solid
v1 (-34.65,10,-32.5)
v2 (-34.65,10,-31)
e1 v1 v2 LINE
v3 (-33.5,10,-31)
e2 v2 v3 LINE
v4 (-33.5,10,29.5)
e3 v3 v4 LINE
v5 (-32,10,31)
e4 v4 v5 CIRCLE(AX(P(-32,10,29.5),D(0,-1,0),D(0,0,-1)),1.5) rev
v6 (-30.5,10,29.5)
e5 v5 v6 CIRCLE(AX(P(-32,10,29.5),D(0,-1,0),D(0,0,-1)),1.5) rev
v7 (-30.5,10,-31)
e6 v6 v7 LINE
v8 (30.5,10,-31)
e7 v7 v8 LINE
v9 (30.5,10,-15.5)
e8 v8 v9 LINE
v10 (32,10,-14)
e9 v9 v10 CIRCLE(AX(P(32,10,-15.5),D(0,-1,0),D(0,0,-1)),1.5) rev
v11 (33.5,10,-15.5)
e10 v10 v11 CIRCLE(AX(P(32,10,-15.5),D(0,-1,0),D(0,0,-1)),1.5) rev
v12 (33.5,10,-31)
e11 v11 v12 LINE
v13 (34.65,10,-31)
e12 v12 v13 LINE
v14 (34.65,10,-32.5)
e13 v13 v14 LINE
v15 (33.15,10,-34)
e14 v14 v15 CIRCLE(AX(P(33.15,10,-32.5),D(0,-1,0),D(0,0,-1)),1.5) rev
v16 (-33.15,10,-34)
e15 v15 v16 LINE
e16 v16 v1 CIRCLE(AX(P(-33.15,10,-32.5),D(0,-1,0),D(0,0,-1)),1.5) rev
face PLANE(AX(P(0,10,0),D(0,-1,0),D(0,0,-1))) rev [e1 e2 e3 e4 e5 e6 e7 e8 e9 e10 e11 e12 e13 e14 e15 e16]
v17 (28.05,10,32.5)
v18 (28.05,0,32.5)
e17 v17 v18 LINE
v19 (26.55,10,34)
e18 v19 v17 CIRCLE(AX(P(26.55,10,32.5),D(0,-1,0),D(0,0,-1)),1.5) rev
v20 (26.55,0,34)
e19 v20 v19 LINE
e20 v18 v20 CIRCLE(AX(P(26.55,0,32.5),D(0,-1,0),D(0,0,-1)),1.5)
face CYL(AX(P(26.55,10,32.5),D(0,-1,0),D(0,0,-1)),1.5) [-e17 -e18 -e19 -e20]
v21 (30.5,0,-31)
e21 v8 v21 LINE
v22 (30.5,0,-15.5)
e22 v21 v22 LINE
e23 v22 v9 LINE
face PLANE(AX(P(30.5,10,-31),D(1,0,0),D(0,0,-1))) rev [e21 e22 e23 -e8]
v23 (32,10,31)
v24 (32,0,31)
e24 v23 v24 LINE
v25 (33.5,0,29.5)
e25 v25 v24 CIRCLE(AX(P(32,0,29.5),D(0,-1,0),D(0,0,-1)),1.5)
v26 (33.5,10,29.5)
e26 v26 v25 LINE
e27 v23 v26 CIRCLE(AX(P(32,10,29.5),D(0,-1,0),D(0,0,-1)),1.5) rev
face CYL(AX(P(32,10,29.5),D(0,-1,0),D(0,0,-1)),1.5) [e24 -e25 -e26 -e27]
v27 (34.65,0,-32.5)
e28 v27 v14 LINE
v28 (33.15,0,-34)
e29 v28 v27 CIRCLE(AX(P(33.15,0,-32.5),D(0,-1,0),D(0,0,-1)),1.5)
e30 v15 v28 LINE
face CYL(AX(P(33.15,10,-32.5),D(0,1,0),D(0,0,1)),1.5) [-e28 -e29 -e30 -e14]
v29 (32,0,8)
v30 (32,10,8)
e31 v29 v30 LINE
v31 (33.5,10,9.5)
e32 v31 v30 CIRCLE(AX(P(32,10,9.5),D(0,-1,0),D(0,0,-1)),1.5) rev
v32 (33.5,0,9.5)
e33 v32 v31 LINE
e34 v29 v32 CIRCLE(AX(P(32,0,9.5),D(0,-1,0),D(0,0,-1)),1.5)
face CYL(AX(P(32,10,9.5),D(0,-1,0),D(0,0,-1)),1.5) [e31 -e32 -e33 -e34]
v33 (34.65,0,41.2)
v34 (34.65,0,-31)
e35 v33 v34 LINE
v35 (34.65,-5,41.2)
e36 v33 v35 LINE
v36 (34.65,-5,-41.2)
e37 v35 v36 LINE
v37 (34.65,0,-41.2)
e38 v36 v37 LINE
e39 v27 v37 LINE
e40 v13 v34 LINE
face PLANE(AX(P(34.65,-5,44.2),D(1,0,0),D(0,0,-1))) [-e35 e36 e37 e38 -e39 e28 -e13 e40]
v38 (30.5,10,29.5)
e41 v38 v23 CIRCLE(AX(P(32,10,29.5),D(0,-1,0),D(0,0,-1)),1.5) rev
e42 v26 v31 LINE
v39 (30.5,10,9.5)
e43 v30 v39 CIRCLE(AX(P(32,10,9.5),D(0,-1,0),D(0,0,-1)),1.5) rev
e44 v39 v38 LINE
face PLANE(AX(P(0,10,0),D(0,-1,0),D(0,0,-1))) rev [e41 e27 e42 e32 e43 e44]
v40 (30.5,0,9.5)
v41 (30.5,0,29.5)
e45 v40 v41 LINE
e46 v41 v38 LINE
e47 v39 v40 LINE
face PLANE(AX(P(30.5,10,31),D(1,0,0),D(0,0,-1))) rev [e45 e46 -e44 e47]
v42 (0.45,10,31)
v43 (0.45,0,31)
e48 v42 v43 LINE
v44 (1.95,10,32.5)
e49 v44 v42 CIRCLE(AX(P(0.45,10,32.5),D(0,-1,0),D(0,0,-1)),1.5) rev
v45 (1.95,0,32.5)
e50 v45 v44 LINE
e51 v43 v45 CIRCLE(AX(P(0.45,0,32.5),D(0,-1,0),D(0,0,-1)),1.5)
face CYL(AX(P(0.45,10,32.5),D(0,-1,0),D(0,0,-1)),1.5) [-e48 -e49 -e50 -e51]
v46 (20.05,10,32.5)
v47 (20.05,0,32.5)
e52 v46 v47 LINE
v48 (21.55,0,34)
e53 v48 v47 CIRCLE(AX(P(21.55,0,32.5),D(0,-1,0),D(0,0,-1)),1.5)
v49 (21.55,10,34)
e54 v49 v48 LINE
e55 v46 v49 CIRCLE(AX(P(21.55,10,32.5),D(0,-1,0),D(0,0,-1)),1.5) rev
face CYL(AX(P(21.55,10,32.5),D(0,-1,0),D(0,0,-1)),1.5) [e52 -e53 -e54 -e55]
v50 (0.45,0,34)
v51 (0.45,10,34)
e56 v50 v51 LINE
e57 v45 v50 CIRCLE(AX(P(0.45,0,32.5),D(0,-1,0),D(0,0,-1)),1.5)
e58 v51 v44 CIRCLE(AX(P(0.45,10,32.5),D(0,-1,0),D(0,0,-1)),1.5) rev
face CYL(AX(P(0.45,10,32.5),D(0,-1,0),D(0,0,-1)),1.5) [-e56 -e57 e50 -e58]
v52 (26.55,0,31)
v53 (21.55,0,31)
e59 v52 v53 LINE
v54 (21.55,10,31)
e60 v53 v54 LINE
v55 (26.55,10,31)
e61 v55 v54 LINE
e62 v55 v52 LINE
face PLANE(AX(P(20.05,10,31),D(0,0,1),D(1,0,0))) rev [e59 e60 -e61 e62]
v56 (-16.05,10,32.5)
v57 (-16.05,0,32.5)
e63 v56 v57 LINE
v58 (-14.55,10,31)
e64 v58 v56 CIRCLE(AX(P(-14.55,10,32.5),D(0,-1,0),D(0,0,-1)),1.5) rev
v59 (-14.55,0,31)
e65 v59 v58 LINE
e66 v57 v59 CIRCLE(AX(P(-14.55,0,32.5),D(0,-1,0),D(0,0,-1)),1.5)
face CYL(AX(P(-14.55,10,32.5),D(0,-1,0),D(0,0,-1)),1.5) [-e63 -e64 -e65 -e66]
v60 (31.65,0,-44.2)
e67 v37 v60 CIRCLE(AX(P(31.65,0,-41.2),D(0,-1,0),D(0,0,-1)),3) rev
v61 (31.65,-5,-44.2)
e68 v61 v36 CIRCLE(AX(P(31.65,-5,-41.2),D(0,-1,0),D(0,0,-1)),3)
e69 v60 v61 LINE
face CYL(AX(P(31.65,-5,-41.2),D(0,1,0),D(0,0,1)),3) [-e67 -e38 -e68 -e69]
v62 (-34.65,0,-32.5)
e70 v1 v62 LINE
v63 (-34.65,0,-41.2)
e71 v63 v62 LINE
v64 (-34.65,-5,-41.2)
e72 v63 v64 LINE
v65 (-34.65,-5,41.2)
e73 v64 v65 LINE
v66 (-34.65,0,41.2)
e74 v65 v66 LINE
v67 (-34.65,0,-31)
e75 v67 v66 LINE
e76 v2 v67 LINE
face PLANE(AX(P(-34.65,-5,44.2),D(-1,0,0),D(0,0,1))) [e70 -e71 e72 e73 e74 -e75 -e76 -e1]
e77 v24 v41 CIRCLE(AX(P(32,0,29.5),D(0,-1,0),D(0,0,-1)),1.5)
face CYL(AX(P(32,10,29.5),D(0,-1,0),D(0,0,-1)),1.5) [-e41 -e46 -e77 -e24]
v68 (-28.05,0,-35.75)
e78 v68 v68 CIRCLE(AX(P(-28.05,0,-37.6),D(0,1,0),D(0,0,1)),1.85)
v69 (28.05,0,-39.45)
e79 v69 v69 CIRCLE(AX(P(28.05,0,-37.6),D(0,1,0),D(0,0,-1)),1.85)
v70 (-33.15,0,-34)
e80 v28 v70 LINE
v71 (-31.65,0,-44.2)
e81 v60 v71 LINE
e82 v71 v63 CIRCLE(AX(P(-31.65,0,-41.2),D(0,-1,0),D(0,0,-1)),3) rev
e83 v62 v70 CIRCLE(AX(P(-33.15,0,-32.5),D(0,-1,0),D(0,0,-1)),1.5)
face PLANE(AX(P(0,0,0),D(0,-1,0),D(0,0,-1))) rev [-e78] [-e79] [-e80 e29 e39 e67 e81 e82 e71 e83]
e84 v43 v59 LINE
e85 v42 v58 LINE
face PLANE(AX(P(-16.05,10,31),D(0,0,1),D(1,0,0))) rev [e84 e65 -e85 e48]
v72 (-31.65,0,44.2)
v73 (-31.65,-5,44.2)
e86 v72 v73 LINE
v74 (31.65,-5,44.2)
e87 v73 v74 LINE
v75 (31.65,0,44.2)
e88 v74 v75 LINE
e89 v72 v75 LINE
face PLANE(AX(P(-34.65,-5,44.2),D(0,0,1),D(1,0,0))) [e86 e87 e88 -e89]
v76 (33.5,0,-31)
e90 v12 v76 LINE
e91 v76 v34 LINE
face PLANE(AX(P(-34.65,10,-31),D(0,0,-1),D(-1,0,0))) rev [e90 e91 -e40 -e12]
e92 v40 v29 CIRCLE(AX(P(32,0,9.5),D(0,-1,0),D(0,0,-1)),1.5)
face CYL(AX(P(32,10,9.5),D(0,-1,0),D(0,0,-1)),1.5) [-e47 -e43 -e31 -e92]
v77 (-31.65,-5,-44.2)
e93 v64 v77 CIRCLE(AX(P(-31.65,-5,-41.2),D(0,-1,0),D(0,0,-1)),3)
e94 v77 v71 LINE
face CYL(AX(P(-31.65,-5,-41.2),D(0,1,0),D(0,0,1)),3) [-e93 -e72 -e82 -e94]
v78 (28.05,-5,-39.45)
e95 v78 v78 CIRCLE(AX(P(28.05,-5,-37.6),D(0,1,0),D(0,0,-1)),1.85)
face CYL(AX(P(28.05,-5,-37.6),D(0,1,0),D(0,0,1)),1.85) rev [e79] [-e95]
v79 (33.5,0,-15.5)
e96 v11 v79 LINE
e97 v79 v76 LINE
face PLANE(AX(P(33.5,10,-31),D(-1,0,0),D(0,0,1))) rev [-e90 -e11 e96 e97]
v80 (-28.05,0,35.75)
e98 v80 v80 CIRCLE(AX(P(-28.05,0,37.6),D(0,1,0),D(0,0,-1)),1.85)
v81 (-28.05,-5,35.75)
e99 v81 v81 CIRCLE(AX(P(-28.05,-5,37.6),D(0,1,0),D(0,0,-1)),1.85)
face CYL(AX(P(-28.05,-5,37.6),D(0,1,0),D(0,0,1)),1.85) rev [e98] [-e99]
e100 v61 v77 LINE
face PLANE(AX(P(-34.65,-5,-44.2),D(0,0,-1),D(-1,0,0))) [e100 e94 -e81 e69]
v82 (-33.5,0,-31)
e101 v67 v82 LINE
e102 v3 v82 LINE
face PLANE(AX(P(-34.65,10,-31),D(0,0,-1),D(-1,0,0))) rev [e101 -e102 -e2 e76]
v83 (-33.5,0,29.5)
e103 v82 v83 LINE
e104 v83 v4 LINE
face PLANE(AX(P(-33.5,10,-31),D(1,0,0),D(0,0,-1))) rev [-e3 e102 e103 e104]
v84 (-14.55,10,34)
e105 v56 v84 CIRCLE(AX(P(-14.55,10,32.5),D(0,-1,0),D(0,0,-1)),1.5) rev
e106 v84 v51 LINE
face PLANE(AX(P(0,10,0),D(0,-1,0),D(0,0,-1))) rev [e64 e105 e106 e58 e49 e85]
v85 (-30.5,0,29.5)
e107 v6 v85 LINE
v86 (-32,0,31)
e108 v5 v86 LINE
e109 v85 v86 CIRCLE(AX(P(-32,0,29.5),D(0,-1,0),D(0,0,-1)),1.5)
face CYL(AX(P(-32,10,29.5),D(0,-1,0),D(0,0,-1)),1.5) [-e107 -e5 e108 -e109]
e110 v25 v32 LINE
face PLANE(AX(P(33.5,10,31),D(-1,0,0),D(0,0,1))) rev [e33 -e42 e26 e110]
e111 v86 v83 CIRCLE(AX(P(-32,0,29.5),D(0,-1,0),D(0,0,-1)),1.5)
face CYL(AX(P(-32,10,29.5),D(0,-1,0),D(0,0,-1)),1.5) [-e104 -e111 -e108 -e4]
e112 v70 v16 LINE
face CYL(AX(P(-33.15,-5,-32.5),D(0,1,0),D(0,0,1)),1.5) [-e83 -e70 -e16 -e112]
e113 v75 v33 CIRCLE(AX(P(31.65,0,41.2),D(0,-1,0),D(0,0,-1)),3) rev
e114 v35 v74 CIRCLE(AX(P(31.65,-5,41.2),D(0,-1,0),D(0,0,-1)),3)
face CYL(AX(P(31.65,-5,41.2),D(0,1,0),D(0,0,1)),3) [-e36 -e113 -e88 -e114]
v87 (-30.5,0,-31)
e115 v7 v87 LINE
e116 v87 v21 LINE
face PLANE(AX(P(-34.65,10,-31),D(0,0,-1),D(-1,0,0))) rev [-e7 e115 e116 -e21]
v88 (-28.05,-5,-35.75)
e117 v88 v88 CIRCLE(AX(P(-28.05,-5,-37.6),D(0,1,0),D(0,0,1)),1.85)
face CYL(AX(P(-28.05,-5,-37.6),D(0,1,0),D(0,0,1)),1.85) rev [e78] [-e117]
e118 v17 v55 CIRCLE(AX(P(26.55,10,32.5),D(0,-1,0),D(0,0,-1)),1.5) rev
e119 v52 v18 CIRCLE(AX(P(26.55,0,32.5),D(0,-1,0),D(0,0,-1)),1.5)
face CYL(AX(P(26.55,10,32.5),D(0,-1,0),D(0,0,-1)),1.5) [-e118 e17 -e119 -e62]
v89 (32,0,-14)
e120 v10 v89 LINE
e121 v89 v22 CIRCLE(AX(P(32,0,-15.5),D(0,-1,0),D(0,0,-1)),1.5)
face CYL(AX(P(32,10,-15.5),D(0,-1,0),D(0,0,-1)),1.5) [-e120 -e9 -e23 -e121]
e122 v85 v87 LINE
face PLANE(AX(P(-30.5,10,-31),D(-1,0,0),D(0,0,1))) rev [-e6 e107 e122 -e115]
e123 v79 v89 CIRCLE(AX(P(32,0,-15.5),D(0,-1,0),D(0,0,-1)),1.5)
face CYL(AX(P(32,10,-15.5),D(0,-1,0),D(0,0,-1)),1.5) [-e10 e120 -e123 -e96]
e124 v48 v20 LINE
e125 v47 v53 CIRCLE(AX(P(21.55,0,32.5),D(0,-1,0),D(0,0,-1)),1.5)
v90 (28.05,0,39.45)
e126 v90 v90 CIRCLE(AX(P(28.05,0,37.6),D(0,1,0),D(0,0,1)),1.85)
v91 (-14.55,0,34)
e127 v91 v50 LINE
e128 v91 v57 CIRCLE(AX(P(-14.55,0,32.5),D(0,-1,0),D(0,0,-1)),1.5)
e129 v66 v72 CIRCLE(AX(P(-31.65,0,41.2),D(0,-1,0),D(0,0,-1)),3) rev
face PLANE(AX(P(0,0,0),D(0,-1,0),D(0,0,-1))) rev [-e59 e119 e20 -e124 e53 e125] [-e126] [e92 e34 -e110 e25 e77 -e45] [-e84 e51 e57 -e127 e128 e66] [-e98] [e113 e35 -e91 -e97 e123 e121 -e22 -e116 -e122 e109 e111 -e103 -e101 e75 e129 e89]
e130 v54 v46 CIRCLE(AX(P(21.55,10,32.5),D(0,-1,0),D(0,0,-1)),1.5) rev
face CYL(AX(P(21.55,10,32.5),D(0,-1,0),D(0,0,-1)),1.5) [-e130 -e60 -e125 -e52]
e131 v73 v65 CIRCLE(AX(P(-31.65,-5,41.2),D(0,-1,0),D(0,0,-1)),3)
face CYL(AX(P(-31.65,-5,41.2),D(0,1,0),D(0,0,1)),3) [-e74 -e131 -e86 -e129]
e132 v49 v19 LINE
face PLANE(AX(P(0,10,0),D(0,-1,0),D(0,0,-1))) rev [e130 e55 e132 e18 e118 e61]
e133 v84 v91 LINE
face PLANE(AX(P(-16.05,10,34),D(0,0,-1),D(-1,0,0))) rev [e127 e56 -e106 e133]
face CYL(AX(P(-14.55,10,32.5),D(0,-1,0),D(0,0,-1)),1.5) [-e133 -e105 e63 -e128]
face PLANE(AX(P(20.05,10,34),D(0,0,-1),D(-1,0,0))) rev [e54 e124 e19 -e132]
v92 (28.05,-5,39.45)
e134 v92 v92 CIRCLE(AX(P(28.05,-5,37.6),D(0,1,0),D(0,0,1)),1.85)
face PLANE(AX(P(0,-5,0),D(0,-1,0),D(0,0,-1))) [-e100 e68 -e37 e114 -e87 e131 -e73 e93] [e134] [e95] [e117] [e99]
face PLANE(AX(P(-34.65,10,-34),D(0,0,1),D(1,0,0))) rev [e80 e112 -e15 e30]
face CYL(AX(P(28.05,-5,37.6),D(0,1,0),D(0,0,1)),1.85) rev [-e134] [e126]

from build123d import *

# Parameters (mm, degrees)
SKETCH_1_W      = 69.3
SKETCH_1_H      = 88.4
SKETCH_1_R      = 1.85
EXTRUDE_1_DEPTH = 5
SKETCH_3_W      = 69.3
SKETCH_3_H      = 3
SKETCH_3_W_2    = 8
SKETCH_3_W_3    = 18
EXTRUDE_2_DEPTH = 10
SKETCH_4_W      = 3
SKETCH_4_H      = 62
SKETCH_4_H_2    = 17
SKETCH_4_H_3    = 23
EXTRUDE_3_DEPTH = 10
FILLET_1_R      = 3
FILLET_2_R      = 1.5
FILLET_3_R      = 1.5


with BuildPart() as part:
    # 草图1 → 凸台-拉伸1 (new body)
    with BuildSketch(Plane(origin=(0, 0, 0), x_dir=(1, 0, 0), z_dir=(0, 1, 0))):
        Rectangle(SKETCH_1_W, SKETCH_1_H)
        with Locations(Location((-28.05, 37.6, 0), (0, 0, 270))):
            Circle(SKETCH_1_R, mode=Mode.SUBTRACT)
        with Locations(Location((28.05, 37.6, 0), (0, 0, 90))):
            Circle(SKETCH_1_R, mode=Mode.SUBTRACT)
        with Locations(Location((28.05, -37.6, 0), (0, 0, 270))):
            Circle(SKETCH_1_R, mode=Mode.SUBTRACT)
        with Locations(Location((-28.05, -37.6, 0), (0, 0, 90))):
            Circle(SKETCH_1_R, mode=Mode.SUBTRACT)
    extrude(amount=-EXTRUDE_1_DEPTH)

    # 草图3 → 凸台-拉伸2 (add)
    with BuildSketch(Plane(origin=(0, 0, 0), x_dir=(1, 0, 0), z_dir=(0, 1, 0))):
        with Locations((0, 32.5)):
            Rectangle(SKETCH_3_W, SKETCH_3_H)
        with Locations((24.05, -32.5)):
            Rectangle(SKETCH_3_W_2, SKETCH_3_H)
        with Locations((-7.05, -32.5)):
            Rectangle(SKETCH_3_W_3, SKETCH_3_H)
    extrude(amount=EXTRUDE_2_DEPTH)

    # 草图4 → 凸台-拉伸3 (add)
    with BuildSketch(Plane(origin=(0, 0, 0), x_dir=(1, 0, 0), z_dir=(0, 1, 0))):
        with Locations((-32, 0)):
            Rectangle(SKETCH_4_W, SKETCH_4_H)
        with Locations((32, 22.5)):
            Rectangle(SKETCH_4_W, SKETCH_4_H_2)
        with Locations((32, -19.5)):
            Rectangle(SKETCH_4_W, SKETCH_4_H_3)
    extrude(amount=EXTRUDE_3_DEPTH)

    # 圆角1
    fillet_1_edges = [part.edges().sort_by_distance(p)[0] for p in [
        (34.65, -2.5, 44.2),
        (-34.65, -2.5, 44.2),
        (-34.65, -2.5, -44.2),
        (34.65, -2.5, -44.2),
    ]]
    fillet(fillet_1_edges, radius=FILLET_1_R)

    # 圆角2
    fillet_2_edges = [part.edges().sort_by_distance(p)[0] for p in [
        (20.05, 5, 34),
        (20.05, 5, 31),
        (28.05, 5, 31),
        (28.05, 5, 34),
        (-16.05, 5, 34),
        (-16.05, 5, 31),
        (1.95, 5, 34),
        (1.95, 5, 31),
    ]]
    fillet(fillet_2_edges, radius=FILLET_2_R - 0.0001)  # a hair under: the kernel refuses the full size

    # 圆角3
    fillet_3_edges = [part.edges().sort_by_distance(p)[0] for p in [
        (34.65, 5, -34),
        (-34.65, 5, -34),
        (-30.5, 5, 31),
        (-33.5, 5, 31),
        (33.5, 5, 31),
        (30.5, 5, 31),
        (33.5, 5, 8),
        (30.5, 5, 8),
        (33.5, 5, -14),
        (30.5, 5, -14),
    ]]
    fillet(fillet_3_edges, radius=FILLET_3_R - 0.0001)  # a hair under: the kernel refuses the full size


solid = part.part
